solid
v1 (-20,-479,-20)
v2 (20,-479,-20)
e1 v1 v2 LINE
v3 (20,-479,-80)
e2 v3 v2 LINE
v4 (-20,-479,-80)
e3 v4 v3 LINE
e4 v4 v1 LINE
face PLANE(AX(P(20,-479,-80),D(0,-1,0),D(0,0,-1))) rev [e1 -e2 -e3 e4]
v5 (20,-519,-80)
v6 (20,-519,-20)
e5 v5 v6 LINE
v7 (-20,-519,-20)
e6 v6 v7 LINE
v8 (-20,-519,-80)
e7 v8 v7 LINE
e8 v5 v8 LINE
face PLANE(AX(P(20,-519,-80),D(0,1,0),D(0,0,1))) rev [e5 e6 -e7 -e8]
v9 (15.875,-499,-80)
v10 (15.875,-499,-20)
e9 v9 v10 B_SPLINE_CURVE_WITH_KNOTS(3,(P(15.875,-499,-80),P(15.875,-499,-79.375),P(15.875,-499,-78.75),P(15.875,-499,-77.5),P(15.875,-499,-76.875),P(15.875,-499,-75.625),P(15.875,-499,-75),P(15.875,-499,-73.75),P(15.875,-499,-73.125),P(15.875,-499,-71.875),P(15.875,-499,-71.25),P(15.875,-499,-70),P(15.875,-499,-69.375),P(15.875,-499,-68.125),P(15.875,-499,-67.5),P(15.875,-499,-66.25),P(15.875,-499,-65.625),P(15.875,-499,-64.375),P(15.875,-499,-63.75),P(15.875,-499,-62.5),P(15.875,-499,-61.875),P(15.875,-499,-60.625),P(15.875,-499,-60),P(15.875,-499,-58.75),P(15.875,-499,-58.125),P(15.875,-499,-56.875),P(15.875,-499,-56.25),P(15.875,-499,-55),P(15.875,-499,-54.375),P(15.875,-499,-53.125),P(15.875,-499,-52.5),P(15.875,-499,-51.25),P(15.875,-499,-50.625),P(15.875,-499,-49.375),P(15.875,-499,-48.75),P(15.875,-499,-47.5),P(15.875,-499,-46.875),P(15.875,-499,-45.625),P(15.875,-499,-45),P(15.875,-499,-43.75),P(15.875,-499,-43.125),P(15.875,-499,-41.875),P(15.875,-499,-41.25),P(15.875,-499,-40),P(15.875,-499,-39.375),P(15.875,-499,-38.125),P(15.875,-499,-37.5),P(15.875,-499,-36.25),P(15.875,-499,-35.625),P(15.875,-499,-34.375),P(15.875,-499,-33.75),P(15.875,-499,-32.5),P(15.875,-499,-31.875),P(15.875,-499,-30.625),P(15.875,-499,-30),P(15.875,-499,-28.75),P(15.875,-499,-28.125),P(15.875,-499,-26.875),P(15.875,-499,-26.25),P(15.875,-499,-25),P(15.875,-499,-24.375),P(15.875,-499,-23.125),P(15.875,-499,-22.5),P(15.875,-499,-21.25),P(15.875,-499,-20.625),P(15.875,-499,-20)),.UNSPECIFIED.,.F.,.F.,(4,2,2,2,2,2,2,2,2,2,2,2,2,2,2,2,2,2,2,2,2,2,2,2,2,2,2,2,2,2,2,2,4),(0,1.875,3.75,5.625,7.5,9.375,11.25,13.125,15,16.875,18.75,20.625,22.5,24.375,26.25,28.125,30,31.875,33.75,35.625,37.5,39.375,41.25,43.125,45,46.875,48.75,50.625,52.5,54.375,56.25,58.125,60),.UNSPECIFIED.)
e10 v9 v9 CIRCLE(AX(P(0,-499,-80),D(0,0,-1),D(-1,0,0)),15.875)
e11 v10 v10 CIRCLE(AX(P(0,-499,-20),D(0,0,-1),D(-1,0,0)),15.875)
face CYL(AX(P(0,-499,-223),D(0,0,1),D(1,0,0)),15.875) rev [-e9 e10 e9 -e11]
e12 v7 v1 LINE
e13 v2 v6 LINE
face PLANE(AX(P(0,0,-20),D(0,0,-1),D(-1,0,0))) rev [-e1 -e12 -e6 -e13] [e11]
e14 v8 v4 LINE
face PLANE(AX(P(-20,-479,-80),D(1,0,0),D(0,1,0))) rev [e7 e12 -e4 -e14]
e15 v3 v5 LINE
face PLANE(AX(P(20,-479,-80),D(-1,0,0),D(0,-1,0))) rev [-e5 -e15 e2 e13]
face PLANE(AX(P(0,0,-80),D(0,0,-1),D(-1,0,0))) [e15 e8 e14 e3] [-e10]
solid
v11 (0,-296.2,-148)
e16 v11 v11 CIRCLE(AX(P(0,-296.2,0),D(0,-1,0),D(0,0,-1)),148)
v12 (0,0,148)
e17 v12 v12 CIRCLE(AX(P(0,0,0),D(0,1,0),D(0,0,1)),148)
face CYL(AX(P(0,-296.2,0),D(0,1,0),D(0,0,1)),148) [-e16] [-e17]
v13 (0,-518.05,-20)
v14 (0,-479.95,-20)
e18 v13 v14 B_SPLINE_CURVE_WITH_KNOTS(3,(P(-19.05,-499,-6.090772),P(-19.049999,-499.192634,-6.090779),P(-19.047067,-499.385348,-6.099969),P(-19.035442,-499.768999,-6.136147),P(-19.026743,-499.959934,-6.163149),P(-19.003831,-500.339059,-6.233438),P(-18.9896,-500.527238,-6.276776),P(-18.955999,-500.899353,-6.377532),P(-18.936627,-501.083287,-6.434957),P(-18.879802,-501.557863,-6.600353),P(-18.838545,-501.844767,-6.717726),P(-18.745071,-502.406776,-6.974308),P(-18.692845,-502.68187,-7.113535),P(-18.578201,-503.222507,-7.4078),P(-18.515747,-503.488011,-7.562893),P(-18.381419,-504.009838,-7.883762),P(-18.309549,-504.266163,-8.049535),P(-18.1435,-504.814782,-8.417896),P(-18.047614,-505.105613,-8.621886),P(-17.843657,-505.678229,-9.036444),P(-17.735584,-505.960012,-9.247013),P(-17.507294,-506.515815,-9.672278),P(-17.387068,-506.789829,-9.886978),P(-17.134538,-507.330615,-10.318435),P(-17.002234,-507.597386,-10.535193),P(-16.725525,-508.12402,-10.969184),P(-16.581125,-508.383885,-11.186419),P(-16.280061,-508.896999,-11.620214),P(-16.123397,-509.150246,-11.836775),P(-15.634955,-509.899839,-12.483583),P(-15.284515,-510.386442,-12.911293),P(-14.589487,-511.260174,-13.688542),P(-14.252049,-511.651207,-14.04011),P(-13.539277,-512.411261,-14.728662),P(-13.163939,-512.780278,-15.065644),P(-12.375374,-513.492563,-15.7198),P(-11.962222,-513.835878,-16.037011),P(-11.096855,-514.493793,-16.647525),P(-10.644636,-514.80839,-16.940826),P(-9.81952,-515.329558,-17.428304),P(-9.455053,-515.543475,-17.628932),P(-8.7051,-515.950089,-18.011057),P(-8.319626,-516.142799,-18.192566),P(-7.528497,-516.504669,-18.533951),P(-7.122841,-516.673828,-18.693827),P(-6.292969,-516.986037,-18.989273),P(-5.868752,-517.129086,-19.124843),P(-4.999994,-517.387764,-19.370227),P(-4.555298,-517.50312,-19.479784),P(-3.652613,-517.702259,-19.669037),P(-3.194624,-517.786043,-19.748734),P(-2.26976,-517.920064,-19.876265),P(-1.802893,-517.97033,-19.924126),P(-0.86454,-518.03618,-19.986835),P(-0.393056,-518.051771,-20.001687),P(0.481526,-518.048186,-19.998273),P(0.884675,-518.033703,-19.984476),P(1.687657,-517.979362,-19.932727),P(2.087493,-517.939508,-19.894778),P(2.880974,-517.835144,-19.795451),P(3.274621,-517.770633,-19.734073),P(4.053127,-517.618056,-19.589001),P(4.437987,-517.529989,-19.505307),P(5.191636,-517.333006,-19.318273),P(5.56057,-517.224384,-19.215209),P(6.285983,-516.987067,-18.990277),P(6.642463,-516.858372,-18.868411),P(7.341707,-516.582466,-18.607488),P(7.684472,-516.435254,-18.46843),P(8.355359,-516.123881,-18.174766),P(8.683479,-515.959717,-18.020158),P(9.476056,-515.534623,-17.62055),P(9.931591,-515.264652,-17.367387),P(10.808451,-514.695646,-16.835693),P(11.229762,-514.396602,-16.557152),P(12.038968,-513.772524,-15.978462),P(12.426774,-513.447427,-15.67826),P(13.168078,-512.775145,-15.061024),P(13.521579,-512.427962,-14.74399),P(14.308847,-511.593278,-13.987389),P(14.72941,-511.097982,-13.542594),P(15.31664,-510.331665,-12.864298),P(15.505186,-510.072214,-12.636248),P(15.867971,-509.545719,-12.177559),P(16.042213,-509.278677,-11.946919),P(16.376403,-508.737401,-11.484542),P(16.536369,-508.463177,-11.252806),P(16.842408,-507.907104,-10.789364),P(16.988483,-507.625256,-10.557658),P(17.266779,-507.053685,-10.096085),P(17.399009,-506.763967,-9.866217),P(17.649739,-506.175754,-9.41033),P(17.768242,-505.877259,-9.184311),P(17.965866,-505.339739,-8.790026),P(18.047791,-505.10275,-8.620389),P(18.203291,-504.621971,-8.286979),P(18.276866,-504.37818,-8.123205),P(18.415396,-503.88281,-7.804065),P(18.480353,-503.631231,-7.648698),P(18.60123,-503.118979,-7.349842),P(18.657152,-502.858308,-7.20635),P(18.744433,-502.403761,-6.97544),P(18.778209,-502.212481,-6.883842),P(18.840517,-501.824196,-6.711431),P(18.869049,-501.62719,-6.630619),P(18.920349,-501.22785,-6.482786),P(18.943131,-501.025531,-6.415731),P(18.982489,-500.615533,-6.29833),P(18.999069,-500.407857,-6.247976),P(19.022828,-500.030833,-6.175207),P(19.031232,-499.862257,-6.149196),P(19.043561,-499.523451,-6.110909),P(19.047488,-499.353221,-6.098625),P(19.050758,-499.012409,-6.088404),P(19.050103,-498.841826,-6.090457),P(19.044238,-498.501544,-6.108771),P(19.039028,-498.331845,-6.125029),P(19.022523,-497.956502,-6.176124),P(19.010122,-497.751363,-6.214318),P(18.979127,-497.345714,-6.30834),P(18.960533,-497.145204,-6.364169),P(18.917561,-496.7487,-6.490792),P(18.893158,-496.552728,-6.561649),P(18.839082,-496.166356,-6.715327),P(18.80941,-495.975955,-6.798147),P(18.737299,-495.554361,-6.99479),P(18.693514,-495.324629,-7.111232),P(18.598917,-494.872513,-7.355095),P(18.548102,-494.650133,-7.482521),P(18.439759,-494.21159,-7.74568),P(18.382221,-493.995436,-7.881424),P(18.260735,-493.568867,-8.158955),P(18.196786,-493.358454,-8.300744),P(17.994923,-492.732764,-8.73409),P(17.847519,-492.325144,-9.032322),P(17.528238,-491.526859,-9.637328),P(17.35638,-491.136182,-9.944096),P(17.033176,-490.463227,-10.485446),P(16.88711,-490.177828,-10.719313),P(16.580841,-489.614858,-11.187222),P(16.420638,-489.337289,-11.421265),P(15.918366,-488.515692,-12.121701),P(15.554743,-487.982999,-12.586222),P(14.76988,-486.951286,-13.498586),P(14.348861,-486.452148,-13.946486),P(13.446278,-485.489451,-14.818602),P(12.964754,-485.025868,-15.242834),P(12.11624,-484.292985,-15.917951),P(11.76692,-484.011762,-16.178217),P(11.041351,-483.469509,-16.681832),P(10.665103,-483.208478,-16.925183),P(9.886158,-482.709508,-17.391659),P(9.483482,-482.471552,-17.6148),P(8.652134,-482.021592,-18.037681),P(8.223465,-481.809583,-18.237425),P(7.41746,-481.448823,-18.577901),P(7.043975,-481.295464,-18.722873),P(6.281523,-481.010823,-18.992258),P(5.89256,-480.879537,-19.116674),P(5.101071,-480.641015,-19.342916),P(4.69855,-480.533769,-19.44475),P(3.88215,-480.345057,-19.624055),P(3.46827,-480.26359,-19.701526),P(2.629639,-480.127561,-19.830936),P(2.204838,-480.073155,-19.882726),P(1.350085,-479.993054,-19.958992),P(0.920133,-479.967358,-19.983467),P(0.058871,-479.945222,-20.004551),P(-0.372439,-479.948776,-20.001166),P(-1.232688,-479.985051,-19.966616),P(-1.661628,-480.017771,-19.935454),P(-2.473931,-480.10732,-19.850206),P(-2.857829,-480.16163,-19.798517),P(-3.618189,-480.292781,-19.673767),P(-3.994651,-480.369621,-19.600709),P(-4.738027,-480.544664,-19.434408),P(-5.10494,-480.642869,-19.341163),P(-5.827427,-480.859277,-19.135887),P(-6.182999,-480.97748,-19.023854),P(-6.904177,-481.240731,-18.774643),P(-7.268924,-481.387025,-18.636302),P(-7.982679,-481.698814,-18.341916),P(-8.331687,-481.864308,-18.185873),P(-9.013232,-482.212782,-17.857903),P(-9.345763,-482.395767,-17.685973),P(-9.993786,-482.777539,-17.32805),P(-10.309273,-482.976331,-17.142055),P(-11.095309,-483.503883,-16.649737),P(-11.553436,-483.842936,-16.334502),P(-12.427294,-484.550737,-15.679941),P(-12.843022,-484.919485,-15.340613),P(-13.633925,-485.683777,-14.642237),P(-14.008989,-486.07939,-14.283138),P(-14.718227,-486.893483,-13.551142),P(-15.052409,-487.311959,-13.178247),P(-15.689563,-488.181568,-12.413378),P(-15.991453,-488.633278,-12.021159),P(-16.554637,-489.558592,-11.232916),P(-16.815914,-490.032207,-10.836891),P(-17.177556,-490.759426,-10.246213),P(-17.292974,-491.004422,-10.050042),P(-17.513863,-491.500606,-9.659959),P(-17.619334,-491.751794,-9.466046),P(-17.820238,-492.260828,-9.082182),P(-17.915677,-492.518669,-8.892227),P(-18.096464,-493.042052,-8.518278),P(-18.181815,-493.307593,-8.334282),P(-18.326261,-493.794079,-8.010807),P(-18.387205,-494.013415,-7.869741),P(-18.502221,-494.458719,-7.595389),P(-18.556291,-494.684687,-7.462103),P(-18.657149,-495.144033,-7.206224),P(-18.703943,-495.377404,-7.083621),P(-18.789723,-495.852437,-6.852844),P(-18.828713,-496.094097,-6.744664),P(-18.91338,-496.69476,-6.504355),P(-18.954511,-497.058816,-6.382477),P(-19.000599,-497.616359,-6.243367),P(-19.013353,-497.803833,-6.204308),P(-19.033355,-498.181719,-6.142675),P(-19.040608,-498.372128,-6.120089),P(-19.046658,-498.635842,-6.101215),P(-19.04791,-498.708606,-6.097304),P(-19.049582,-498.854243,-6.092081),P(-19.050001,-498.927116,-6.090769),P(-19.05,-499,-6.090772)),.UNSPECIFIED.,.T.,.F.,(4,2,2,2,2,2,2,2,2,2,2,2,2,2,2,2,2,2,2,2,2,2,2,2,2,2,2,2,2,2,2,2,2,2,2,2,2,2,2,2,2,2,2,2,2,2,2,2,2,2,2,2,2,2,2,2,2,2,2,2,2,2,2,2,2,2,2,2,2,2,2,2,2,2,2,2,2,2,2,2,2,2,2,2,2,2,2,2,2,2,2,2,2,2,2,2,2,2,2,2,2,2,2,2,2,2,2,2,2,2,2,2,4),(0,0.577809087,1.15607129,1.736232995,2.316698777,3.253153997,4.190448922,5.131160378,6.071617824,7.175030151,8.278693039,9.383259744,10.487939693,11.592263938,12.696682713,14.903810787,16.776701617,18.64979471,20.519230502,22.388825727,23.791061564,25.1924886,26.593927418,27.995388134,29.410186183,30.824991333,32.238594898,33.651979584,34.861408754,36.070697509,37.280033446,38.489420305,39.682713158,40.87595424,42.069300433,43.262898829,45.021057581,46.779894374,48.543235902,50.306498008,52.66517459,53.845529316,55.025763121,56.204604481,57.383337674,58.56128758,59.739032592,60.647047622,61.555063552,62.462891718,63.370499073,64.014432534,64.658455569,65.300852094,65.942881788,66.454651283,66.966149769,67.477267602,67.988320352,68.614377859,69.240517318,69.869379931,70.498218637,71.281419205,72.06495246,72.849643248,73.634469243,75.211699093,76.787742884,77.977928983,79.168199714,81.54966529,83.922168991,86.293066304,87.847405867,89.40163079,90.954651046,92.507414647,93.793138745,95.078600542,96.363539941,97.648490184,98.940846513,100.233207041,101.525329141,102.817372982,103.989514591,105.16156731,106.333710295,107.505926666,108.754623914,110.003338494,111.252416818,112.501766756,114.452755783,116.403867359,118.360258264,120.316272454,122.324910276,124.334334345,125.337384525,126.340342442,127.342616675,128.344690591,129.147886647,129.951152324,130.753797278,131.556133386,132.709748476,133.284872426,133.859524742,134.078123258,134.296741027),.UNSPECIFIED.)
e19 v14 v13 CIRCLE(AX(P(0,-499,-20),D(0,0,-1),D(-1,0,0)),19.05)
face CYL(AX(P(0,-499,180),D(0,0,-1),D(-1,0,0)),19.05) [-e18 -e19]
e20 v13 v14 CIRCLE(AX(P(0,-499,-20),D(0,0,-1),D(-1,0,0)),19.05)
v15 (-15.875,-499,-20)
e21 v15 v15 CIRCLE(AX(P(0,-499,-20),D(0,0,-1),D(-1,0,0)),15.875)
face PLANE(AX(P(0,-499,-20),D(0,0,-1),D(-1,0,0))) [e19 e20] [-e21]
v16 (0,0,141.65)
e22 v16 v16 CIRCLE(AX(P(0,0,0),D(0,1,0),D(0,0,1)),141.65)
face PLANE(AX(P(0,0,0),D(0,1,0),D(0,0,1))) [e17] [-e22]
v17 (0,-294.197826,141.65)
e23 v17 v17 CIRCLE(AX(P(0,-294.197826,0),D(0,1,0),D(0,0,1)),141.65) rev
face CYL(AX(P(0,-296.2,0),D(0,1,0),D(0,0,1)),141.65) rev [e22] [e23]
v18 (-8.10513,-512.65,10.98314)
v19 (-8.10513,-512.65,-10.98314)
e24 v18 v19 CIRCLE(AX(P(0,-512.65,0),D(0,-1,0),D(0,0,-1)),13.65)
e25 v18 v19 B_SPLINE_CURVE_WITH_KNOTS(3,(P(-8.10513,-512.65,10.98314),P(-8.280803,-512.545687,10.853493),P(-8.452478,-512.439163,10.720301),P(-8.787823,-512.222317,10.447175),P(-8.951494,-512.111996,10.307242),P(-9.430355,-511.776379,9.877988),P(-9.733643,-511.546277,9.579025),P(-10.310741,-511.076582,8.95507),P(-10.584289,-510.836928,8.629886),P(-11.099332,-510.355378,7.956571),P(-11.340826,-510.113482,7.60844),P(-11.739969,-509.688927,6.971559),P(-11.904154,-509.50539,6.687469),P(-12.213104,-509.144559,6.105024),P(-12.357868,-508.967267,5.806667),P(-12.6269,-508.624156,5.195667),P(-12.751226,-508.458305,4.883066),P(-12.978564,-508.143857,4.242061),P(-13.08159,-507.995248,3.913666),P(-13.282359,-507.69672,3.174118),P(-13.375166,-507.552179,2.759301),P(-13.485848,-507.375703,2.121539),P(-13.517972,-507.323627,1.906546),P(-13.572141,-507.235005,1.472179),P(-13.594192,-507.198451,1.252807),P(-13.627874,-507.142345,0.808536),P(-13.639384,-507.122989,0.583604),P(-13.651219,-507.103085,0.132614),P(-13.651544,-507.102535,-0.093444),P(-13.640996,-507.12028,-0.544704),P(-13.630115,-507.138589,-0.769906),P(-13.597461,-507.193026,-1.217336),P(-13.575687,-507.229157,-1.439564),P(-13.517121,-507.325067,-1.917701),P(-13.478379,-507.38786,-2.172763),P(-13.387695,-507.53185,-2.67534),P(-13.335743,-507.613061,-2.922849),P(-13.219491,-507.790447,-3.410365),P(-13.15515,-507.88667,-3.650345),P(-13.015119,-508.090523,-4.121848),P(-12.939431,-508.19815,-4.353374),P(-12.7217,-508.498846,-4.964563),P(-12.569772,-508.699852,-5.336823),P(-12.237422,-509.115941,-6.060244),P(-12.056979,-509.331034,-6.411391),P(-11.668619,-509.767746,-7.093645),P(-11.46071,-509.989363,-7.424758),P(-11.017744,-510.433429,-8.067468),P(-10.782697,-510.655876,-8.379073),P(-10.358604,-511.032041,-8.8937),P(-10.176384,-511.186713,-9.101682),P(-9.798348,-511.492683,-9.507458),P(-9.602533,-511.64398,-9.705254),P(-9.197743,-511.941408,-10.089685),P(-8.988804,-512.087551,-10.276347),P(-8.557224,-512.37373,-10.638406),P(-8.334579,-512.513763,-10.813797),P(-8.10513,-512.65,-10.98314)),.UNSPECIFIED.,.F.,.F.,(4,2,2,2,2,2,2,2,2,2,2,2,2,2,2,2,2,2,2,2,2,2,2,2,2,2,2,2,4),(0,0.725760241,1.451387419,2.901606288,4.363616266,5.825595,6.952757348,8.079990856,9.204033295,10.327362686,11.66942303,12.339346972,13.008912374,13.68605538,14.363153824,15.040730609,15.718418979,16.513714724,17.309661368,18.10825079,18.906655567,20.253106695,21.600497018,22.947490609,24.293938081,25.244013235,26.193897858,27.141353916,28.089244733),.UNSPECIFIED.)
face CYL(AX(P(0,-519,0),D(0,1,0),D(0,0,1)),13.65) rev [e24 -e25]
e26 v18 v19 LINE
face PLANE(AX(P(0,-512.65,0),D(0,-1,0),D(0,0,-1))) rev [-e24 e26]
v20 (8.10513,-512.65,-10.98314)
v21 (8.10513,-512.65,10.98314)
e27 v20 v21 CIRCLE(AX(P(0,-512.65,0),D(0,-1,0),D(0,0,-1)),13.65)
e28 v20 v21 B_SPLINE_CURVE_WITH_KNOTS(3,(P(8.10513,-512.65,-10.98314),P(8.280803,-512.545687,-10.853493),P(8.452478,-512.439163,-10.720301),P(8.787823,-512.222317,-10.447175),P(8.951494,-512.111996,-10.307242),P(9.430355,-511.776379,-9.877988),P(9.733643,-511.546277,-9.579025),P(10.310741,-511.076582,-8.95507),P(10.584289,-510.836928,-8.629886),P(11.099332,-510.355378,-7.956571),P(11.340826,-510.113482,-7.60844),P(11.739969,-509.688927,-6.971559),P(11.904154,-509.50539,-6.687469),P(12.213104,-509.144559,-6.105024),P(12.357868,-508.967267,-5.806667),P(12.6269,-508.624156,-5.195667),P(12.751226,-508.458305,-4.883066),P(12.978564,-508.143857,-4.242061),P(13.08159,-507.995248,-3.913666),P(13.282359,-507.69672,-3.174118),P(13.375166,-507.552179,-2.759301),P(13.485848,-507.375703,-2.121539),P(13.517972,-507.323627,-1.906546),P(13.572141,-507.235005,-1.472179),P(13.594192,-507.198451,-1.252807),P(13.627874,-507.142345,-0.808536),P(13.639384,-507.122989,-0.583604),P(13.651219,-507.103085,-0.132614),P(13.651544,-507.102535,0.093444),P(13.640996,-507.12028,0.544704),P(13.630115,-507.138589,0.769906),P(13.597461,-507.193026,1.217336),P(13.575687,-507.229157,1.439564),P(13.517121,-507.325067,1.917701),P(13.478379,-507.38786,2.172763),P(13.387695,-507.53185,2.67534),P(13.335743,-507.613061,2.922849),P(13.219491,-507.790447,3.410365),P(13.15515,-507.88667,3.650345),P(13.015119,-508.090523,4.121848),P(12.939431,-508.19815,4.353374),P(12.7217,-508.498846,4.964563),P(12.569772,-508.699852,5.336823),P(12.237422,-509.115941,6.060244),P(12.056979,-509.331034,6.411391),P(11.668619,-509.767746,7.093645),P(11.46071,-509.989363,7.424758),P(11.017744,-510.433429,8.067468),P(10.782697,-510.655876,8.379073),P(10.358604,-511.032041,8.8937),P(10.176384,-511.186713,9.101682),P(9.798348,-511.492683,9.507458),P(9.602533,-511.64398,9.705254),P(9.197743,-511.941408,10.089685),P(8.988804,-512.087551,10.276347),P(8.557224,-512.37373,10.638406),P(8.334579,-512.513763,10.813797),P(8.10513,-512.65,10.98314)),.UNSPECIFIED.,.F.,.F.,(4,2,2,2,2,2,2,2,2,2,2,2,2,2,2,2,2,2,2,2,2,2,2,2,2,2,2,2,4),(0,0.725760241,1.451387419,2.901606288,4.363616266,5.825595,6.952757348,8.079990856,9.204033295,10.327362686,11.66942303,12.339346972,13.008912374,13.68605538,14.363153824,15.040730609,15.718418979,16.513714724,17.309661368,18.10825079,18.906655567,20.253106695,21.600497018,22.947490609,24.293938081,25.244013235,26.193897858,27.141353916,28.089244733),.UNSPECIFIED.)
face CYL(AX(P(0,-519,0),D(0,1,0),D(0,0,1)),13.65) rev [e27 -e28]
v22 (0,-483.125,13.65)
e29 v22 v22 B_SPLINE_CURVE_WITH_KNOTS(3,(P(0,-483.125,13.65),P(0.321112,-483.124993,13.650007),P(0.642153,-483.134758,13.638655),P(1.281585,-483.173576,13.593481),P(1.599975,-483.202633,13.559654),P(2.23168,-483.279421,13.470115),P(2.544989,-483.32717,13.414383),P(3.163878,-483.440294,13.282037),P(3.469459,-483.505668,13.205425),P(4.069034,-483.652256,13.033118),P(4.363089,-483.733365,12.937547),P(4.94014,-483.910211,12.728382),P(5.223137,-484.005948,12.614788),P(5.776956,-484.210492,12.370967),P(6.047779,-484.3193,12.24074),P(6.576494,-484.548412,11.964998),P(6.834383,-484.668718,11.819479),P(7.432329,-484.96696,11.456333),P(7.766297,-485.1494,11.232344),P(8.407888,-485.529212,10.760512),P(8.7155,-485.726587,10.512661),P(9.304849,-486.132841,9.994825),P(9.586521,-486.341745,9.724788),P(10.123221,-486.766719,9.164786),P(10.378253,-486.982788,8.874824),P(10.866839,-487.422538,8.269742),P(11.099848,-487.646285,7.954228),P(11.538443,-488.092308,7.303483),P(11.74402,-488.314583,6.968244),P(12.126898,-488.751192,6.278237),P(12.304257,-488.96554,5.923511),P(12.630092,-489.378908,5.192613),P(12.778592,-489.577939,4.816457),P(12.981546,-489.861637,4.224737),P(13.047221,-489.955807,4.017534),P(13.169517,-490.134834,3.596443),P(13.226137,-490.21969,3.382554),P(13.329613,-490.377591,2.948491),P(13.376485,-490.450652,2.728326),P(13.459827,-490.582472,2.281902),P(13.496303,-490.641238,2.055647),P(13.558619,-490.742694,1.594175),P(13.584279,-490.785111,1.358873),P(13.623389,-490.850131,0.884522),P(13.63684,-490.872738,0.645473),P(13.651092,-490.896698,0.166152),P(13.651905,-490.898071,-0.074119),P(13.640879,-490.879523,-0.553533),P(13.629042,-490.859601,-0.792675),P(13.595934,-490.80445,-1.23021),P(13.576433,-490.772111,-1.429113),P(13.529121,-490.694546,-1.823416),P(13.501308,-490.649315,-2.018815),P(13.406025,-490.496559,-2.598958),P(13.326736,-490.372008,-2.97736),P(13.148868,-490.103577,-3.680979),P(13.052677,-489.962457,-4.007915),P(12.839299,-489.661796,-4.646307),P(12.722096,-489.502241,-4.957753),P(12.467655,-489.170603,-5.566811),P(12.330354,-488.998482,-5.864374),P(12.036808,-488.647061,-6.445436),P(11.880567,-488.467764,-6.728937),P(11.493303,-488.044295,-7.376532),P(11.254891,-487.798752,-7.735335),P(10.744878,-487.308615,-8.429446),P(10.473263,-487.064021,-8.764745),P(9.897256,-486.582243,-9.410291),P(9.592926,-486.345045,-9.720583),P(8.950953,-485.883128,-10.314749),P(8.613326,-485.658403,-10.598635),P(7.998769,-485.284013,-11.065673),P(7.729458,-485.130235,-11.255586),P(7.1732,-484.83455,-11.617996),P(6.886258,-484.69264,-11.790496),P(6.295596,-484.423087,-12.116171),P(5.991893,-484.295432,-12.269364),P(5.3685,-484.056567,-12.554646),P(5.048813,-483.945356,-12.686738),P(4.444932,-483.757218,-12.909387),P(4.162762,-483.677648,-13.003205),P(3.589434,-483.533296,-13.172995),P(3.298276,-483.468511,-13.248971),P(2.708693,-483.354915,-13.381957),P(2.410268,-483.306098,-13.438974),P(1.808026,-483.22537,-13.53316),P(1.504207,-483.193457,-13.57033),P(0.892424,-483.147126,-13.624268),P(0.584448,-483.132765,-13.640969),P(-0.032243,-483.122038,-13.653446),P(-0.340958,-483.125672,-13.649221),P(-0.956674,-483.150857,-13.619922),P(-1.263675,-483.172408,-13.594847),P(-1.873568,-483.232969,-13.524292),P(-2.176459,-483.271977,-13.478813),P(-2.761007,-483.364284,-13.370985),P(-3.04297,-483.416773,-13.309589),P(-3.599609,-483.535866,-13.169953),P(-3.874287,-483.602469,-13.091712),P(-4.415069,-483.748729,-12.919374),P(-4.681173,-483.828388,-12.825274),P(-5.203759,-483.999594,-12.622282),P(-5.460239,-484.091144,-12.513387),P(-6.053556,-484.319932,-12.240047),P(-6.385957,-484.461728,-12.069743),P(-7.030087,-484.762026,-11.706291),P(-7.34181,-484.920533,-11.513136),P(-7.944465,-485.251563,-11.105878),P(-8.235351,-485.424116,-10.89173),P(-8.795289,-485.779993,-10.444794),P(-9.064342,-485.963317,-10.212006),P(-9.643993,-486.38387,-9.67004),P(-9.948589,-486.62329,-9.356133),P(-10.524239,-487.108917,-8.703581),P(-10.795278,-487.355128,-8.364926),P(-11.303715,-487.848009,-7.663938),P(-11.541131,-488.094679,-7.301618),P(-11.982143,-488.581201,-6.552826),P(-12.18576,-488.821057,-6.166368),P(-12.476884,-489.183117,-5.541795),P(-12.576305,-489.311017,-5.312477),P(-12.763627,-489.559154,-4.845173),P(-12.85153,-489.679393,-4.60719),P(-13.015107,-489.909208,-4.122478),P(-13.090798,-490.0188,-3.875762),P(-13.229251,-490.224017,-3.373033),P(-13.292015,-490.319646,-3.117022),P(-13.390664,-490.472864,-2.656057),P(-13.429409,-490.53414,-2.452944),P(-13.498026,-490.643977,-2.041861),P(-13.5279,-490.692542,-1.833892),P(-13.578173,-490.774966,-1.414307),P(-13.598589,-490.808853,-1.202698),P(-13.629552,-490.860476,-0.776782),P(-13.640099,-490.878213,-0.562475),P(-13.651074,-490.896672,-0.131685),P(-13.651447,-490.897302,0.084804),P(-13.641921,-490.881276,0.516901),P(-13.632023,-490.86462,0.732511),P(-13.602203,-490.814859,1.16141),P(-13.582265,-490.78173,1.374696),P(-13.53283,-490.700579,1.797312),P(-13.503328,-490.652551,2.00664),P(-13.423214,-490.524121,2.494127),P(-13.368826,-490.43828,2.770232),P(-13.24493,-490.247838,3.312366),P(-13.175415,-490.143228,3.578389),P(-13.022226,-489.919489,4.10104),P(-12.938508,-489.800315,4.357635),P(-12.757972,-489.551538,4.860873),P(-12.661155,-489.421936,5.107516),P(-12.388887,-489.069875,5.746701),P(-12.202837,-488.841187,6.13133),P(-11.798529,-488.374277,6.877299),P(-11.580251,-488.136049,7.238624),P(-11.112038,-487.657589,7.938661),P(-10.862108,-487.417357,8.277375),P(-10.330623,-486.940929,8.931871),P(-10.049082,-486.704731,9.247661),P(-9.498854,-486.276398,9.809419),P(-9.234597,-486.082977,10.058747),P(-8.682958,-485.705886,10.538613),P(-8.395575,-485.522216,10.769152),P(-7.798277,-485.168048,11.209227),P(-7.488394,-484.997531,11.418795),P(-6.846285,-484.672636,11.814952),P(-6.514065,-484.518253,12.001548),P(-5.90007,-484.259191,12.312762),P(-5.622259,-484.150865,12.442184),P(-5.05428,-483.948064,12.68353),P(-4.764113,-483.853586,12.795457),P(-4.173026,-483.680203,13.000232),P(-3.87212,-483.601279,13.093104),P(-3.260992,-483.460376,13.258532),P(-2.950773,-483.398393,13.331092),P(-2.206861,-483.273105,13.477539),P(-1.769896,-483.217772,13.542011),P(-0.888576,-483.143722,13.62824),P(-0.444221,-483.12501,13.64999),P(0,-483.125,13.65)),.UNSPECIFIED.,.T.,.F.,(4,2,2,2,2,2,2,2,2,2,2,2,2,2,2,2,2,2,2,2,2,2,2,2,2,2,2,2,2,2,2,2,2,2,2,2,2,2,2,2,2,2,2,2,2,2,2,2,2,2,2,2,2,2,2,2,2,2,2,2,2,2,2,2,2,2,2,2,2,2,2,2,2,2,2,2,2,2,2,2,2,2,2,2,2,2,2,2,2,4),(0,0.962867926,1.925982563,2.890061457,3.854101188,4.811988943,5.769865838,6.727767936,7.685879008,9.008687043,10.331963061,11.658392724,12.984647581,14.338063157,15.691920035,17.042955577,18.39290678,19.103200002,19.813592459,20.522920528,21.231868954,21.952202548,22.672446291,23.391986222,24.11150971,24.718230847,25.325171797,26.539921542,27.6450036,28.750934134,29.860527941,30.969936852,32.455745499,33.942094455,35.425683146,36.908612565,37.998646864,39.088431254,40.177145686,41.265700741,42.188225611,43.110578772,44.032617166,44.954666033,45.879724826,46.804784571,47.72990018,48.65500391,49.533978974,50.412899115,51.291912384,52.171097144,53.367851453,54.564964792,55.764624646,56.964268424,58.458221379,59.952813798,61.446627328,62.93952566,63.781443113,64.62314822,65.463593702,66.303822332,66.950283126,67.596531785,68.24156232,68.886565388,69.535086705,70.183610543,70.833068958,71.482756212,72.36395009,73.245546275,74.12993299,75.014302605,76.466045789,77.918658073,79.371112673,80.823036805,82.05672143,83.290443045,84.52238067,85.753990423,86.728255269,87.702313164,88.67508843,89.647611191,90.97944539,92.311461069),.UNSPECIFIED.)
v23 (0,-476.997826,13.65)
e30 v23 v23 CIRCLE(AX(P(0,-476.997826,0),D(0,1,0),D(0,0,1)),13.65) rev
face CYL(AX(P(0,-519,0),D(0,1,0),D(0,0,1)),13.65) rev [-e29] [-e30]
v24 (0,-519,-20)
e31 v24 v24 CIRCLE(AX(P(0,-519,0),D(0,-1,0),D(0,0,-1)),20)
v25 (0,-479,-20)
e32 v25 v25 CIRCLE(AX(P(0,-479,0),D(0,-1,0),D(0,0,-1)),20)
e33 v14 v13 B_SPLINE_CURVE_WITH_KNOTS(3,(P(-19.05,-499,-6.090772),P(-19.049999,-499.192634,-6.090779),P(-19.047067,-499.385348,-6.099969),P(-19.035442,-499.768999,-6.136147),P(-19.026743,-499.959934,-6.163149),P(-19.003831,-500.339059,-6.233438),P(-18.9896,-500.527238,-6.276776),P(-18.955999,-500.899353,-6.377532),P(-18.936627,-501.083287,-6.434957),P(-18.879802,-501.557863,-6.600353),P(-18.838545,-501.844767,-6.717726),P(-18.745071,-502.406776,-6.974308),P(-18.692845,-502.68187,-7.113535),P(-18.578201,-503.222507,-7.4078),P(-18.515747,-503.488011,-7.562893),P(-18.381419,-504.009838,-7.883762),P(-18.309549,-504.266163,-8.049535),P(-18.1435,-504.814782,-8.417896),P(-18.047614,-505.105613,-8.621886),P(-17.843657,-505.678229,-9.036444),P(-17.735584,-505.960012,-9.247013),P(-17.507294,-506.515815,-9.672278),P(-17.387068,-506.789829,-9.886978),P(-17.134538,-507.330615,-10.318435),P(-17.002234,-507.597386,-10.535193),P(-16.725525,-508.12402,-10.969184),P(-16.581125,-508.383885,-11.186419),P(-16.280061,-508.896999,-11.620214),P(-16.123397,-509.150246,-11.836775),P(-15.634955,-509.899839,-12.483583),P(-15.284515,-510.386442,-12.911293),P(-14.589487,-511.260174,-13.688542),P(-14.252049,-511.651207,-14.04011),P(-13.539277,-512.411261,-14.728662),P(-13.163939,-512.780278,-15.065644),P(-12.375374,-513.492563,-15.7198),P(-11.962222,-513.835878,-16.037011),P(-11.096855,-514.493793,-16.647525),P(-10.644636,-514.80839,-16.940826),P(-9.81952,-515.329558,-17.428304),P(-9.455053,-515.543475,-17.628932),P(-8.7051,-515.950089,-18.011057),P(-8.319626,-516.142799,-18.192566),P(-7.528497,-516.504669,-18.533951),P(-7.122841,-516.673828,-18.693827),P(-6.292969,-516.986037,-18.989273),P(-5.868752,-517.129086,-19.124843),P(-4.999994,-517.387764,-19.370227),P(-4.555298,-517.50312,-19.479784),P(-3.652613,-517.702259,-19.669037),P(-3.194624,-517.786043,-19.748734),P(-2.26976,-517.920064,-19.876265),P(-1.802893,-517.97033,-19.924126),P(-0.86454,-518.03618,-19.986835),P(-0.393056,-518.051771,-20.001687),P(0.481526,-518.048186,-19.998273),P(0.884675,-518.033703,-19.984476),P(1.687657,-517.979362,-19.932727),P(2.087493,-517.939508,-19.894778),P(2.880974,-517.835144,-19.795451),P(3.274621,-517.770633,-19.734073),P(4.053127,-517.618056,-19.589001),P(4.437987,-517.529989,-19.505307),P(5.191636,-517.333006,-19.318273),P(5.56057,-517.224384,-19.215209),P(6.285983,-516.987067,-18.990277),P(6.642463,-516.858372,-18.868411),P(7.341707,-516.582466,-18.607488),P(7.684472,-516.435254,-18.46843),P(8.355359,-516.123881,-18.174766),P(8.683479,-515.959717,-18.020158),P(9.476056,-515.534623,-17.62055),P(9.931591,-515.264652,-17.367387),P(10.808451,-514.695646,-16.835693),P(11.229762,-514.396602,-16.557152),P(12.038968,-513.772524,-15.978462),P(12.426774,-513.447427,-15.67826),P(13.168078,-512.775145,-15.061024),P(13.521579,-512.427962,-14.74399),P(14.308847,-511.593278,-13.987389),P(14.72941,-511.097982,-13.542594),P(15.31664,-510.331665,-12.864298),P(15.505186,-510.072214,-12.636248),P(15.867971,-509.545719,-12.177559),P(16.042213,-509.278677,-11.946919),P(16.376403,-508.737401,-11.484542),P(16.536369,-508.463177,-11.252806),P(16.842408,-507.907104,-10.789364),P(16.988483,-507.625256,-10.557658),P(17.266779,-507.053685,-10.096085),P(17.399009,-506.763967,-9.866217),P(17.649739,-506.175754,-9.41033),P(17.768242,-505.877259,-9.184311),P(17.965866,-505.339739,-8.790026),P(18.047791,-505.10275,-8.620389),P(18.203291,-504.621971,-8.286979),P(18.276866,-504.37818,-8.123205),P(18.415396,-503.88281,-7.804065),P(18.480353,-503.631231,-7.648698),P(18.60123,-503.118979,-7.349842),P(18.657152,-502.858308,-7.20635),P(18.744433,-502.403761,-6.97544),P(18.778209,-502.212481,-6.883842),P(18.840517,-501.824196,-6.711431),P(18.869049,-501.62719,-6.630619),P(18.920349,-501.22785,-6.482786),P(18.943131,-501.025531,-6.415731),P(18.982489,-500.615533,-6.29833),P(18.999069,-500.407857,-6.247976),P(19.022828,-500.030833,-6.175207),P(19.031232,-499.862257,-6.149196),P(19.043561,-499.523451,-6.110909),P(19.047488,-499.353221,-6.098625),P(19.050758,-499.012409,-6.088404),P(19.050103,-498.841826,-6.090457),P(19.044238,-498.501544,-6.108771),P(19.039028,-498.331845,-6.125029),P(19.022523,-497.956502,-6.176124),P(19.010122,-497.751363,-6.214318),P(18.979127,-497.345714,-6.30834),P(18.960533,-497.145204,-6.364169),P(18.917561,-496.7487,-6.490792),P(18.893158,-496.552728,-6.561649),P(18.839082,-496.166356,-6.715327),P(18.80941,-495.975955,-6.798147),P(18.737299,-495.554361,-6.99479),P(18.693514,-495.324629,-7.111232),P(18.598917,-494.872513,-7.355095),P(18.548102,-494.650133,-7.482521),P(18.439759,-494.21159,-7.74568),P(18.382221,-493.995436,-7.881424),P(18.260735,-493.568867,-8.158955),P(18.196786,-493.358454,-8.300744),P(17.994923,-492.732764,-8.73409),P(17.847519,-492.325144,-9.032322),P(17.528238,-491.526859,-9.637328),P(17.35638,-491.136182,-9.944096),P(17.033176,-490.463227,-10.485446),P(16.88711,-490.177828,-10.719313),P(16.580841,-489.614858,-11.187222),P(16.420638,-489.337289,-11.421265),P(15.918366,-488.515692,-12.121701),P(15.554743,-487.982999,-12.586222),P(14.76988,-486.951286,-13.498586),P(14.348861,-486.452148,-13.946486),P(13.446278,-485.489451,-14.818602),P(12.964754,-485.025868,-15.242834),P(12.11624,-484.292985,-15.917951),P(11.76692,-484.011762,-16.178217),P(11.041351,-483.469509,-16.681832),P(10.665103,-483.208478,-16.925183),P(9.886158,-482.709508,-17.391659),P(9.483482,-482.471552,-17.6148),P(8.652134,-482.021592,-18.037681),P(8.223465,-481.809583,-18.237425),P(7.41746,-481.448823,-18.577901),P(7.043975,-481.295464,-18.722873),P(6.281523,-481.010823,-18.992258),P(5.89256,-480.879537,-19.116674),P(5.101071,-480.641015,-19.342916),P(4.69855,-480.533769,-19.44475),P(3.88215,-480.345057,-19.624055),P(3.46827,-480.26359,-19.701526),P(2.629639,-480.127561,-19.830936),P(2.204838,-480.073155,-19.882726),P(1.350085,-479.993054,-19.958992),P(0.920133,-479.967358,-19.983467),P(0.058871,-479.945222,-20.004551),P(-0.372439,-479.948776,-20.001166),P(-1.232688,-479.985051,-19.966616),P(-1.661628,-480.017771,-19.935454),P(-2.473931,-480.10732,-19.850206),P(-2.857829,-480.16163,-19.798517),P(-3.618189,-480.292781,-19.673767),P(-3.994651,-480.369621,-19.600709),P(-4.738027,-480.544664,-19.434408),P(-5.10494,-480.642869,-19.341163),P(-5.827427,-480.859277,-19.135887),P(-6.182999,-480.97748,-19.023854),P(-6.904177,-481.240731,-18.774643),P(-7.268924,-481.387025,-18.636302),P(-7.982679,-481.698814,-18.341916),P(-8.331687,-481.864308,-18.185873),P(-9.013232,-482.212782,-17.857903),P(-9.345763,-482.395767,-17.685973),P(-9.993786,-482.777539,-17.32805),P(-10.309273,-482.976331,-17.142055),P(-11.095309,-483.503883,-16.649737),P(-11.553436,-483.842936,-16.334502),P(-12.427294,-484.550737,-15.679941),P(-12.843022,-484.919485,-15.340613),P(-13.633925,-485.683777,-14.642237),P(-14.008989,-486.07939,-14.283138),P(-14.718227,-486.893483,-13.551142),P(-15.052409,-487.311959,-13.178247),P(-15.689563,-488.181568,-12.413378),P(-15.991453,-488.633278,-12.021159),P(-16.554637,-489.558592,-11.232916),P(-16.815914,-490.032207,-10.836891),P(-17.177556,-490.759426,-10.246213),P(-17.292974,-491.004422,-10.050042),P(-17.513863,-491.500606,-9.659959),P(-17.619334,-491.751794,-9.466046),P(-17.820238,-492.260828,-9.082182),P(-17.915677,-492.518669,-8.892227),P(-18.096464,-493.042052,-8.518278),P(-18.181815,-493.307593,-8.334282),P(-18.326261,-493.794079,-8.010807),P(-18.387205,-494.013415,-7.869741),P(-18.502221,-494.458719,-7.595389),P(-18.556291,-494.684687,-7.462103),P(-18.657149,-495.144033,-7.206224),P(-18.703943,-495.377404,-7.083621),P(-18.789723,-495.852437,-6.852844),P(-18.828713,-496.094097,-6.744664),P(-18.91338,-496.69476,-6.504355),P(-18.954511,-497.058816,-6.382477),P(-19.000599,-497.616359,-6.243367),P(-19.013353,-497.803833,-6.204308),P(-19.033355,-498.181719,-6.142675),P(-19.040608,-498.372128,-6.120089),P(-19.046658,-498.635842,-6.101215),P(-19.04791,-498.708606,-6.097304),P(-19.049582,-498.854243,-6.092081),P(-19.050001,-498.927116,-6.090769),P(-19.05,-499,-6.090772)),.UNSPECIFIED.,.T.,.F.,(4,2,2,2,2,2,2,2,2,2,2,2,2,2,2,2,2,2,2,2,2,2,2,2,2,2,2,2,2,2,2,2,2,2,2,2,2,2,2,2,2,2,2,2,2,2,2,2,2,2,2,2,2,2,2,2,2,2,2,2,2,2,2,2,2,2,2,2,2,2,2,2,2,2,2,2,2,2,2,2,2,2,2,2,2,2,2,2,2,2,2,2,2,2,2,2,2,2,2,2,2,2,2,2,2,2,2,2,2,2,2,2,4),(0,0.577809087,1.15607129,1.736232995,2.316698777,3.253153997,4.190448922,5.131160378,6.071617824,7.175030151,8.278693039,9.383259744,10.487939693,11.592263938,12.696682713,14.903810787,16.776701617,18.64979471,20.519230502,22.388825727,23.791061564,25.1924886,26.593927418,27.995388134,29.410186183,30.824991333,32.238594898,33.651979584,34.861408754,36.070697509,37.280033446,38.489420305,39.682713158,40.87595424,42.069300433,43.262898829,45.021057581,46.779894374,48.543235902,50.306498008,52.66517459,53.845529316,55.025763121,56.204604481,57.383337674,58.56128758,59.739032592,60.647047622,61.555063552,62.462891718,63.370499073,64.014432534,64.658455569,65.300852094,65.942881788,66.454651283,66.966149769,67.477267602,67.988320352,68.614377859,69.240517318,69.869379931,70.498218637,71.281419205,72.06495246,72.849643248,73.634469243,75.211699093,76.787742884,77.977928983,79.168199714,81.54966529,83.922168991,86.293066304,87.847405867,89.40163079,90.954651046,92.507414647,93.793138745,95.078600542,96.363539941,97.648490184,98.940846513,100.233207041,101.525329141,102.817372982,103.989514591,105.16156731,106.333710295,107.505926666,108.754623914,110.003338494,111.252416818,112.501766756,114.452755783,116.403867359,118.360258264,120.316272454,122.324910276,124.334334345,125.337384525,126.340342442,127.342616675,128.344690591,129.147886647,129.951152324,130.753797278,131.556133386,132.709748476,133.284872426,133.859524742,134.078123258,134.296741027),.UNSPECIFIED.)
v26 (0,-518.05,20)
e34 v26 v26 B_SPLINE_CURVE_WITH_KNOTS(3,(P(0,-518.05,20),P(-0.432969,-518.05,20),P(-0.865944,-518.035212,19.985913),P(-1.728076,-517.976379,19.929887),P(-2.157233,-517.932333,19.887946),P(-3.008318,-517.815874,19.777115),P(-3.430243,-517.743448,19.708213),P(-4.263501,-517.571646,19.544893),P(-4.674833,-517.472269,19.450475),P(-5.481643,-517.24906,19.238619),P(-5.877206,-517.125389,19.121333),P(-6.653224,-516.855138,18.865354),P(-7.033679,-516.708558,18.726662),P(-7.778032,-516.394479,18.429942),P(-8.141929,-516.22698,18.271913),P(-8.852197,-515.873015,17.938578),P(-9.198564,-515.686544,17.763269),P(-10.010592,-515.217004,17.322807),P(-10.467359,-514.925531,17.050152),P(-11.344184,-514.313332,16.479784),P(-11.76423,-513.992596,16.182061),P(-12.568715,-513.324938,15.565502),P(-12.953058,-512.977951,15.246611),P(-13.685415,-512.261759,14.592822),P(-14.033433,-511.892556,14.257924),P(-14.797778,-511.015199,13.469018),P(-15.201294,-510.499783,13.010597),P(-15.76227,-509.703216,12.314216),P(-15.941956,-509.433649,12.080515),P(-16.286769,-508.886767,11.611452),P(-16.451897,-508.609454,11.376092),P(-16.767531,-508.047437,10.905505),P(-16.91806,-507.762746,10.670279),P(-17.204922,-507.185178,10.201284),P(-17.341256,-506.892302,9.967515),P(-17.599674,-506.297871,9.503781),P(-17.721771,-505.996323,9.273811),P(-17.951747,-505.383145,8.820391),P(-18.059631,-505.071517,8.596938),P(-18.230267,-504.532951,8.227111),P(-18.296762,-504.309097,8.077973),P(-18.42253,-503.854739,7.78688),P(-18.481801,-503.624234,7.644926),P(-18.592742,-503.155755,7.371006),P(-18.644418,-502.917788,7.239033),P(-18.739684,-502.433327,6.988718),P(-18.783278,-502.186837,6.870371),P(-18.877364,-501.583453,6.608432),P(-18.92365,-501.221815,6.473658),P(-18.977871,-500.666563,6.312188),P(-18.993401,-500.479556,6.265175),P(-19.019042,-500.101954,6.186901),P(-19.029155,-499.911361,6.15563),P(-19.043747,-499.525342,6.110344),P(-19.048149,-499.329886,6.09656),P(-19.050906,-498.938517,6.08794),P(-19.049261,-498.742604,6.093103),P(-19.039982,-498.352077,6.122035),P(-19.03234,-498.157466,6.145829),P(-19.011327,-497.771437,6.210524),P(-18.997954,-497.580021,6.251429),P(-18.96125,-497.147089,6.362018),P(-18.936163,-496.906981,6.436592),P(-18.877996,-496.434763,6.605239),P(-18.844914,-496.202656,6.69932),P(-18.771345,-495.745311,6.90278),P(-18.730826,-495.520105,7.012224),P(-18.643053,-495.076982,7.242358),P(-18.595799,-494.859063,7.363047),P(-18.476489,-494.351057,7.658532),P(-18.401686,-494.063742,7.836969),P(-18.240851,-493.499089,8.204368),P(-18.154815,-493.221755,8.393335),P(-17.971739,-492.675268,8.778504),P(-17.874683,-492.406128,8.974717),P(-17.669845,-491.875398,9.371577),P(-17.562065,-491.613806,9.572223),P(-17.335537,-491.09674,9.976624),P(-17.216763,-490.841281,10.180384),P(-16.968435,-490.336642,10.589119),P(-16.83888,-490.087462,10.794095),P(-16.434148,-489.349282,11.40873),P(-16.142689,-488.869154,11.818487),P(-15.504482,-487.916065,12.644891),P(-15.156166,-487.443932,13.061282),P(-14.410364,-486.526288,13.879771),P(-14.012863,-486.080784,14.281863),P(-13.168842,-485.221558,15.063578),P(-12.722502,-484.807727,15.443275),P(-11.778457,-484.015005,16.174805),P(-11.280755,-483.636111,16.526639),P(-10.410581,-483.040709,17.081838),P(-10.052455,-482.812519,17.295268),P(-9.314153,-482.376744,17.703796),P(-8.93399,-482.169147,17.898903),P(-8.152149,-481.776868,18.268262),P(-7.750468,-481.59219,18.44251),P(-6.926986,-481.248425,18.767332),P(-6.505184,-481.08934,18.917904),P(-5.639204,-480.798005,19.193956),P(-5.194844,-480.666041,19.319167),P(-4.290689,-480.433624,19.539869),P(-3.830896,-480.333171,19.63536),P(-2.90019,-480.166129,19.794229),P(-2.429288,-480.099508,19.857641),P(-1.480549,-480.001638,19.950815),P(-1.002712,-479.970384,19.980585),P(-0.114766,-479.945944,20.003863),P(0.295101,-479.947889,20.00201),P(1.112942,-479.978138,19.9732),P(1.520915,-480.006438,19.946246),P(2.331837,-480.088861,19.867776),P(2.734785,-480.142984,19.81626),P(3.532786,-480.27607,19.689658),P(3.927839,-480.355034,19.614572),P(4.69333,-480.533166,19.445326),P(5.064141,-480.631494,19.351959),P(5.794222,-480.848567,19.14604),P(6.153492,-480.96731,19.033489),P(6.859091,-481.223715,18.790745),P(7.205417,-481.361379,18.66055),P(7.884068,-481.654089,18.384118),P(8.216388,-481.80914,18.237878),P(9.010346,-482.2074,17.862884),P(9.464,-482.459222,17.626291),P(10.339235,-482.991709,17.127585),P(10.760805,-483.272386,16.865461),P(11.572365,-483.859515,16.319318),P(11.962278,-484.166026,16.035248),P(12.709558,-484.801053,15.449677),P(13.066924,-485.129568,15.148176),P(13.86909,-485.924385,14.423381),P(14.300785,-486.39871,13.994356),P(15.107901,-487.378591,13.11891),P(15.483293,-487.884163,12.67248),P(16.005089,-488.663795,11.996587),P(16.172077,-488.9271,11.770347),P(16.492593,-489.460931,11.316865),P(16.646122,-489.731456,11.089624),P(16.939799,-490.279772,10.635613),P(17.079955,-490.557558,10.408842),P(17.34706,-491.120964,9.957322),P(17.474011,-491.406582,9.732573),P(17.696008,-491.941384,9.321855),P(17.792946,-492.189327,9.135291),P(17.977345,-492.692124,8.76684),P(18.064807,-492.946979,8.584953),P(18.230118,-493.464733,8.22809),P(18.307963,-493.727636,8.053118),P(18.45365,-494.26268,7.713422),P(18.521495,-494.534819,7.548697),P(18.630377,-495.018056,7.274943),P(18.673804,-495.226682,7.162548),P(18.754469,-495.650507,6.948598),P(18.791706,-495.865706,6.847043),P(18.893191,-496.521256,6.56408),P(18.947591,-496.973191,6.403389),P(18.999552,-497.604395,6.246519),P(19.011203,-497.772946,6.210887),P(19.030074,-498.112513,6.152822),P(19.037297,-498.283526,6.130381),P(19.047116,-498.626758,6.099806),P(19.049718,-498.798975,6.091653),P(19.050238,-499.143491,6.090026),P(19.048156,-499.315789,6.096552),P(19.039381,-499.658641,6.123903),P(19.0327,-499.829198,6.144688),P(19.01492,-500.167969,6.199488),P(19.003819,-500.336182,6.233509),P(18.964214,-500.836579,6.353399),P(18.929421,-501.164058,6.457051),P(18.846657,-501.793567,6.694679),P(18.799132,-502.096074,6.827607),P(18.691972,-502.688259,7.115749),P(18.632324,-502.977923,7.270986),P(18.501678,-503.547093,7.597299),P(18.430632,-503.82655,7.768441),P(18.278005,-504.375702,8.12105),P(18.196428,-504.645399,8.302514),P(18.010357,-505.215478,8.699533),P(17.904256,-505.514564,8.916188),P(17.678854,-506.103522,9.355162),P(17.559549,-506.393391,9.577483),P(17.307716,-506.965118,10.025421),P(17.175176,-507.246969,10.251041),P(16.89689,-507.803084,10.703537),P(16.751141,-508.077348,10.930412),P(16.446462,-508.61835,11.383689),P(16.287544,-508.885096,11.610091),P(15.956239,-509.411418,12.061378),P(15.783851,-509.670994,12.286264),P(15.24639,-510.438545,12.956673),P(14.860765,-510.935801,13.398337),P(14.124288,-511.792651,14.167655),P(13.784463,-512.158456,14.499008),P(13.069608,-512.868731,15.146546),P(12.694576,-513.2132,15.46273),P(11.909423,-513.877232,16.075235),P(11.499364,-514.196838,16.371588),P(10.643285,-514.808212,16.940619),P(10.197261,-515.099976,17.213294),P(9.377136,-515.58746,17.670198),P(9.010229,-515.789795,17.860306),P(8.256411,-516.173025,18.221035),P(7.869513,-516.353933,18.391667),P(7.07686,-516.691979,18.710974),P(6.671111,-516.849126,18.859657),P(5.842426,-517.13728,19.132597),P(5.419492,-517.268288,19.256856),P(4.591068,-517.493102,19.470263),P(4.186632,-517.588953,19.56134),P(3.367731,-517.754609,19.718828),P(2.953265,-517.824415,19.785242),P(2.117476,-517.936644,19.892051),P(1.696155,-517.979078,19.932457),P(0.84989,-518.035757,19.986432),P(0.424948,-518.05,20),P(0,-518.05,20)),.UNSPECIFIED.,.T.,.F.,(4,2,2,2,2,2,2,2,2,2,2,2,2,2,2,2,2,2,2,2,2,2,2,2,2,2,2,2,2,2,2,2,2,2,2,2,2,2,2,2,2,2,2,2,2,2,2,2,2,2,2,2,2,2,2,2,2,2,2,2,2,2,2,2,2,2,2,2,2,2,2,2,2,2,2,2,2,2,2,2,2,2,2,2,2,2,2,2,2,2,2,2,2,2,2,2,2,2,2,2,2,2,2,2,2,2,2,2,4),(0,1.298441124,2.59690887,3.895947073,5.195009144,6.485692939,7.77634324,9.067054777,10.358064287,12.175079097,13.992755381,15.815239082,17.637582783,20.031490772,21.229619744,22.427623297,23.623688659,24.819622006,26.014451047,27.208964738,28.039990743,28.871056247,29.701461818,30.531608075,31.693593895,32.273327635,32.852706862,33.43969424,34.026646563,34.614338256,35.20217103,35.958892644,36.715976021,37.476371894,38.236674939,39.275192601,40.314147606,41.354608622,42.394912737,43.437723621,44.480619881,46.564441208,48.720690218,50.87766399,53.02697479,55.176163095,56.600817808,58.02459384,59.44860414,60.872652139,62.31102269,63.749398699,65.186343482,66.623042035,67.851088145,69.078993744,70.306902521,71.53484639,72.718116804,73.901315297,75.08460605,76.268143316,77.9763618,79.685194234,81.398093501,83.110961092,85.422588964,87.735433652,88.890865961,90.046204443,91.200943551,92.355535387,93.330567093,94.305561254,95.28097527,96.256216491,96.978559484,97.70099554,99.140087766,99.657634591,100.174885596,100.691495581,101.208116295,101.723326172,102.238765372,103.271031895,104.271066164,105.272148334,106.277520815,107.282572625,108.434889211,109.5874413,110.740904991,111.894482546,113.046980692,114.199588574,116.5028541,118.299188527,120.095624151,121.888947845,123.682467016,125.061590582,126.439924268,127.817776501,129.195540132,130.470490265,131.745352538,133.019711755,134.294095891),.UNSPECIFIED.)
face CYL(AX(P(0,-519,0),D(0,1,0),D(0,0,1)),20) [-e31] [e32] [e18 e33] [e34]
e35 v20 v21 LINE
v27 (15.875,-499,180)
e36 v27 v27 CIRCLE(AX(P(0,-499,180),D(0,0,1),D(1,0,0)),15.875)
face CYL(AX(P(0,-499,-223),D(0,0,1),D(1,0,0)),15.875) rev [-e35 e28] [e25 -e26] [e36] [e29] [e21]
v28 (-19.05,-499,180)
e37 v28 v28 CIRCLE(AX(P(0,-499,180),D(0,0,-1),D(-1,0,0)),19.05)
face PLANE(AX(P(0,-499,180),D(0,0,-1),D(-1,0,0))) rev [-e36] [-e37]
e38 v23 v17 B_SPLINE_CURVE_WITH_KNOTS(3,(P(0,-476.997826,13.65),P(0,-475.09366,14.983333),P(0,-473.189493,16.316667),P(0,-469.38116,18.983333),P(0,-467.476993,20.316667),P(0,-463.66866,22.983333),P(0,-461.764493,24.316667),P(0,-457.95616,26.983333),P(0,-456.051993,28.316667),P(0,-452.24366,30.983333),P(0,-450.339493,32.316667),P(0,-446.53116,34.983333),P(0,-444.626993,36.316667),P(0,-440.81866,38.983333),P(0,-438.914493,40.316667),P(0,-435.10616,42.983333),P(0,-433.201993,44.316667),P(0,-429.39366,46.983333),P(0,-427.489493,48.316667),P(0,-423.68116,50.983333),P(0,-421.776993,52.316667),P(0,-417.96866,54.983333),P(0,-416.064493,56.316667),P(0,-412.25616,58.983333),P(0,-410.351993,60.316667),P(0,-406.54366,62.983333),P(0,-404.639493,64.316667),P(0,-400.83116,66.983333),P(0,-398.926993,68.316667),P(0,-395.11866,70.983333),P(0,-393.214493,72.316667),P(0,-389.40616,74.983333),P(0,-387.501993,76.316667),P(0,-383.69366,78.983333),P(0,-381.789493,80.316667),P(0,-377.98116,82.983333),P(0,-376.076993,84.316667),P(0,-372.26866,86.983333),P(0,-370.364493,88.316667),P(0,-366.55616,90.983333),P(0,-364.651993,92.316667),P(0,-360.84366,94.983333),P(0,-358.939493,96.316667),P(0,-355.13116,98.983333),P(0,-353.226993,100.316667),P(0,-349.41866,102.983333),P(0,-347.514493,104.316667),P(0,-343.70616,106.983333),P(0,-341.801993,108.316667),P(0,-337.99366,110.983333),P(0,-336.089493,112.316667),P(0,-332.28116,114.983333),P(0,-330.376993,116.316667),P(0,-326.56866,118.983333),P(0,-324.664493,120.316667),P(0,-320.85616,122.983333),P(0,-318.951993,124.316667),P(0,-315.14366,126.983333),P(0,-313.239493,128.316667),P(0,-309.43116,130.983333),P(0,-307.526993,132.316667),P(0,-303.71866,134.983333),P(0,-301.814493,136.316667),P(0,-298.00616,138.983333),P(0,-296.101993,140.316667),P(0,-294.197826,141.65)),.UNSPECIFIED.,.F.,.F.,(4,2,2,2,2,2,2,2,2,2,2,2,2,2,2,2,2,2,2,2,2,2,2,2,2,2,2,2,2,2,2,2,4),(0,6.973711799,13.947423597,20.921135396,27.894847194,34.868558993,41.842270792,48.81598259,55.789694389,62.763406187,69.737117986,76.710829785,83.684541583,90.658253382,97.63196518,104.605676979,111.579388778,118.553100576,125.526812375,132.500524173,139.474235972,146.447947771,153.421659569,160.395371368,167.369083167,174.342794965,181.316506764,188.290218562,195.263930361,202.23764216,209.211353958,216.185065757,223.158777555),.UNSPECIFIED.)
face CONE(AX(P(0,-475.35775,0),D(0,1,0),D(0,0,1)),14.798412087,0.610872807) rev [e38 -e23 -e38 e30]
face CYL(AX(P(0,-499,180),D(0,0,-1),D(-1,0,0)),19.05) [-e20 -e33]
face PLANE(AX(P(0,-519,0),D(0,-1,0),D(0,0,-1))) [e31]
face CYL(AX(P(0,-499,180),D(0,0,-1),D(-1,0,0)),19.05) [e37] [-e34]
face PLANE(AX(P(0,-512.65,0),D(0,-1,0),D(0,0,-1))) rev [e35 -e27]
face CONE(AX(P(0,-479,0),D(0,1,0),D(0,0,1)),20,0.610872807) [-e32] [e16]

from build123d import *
from build123d.topology import SkipClean

# Parameters (mm, degrees)
CROQUIS1_R              = 148
SALIENTE_EXTRUIR1_DEPTH = 296.2
CROQUIS3_R              = 20
CROQUIS2_R              = 148
CROQUIS4_R              = 20
SALIENTE_EXTRUIR2_DEPTH = 40
CROQUIS5_R              = 19.05
SALIENTE_EXTRUIR3_DEPTH = 200
CROQUIS6_W              = 40
CROQUIS6_H              = 40
SALIENTE_EXTRUIR4_DEPTH = 60
VACIADO1_START          = -13.65
VACIADO1_OUTLINE_R      = 12.7
VACIADO1_DEPTH          = 193.65
CROQUIS7_R              = 15.875
CORTAR_EXTRUIR1_DEPTH   = 403


with BuildPart() as part:
    # Croquis1 → Saliente-Extruir1 (new body)
    with BuildSketch(Plane(origin=(0, 0, 0), x_dir=(1, 0, 0), z_dir=(0, 1, 0))):
        with Locations(Location((0, 0, 0), (0, 0, 270))):
            Circle(CROQUIS1_R)
    extrude(amount=-SALIENTE_EXTRUIR1_DEPTH)

    # Croquis3 → Recubrir1 section 0
    with BuildSketch(Plane(origin=(0, -479, 0), x_dir=(1, 0, 0), z_dir=(0, 1, 0))):
        Circle(CROQUIS3_R)
    # Croquis2 → Recubrir1 section 1
    with BuildSketch(Plane.XZ.offset(296.2)):
        Circle(CROQUIS2_R)
    loft()

    # Croquis4 → Saliente-Extruir2 (add)
    with BuildSketch(Plane.XZ.offset(479)):
        with Locations(Location((0, 0, 0), (0, 0, 270))):
            Circle(CROQUIS4_R)
    extrude(amount=SALIENTE_EXTRUIR2_DEPTH)

    # Croquis5 → Saliente-Extruir3 (add)
    with BuildSketch(Plane(origin=(0, 0, -20), x_dir=(-1, 0, 0), z_dir=(0, 0, -1))):
        with Locations((0, -499)):
            Circle(CROQUIS5_R)
    extrude(amount=-SALIENTE_EXTRUIR3_DEPTH)

    # Vaciado1: read off the stored shape, not the designer's step
    # Vaciado1 outline → Vaciado1 (cut)
    with BuildSketch(Plane.XY.offset(VACIADO1_START)):
        with Locations((0, -499)):
            Circle(VACIADO1_OUTLINE_R)
    extrude(amount=VACIADO1_DEPTH, mode=Mode.SUBTRACT)

    # Vaciado1 2 outline → Vaciado1 2 (revolve, cut)
    with SkipClean():  # the faces are left unmerged after this step: merging them gives an invalid solid
        with BuildSketch(Plane.XY):
            Polygon((13.65, -476.99782627), (141.65, -294.19782627), (141.65, 0), (0, 0), (0, -512.65), (13.65, -512.65), align=None)
        revolve(axis=Axis((0, 0, 0), (0, 1, 0)), mode=Mode.SUBTRACT)


with BuildPart() as body_2:
    # Croquis6 → Saliente-Extruir4 (new body)
    with BuildSketch(Plane(origin=(0, 0, -20), x_dir=(-1, 0, 0), z_dir=(0, 0, -1))):
        with Locations((0, -499)):
            Rectangle(CROQUIS6_W, CROQUIS6_H)
    extrude(amount=SALIENTE_EXTRUIR4_DEPTH)


with BuildPart() as cortar_extruir1_tool:
    # Croquis7 → Cortar-Extruir1 (new body)
    with BuildSketch(Plane.XY.offset(180)):
        with Locations((0, -499)):
            Circle(CROQUIS7_R)
    extrude(amount=-CORTAR_EXTRUIR1_DEPTH)


with BuildPart() as part_1:
    add(part.part)

    # Cortar-Extruir1: cut by cortar_extruir1_tool
    add(cortar_extruir1_tool.part, mode=Mode.SUBTRACT)


with BuildPart() as body_2_1:
    add(body_2.part)

    # Cortar-Extruir1: cut by cortar_extruir1_tool
    add(cortar_extruir1_tool.part, mode=Mode.SUBTRACT)


solid = Compound([part_1.part, body_2_1.part])
